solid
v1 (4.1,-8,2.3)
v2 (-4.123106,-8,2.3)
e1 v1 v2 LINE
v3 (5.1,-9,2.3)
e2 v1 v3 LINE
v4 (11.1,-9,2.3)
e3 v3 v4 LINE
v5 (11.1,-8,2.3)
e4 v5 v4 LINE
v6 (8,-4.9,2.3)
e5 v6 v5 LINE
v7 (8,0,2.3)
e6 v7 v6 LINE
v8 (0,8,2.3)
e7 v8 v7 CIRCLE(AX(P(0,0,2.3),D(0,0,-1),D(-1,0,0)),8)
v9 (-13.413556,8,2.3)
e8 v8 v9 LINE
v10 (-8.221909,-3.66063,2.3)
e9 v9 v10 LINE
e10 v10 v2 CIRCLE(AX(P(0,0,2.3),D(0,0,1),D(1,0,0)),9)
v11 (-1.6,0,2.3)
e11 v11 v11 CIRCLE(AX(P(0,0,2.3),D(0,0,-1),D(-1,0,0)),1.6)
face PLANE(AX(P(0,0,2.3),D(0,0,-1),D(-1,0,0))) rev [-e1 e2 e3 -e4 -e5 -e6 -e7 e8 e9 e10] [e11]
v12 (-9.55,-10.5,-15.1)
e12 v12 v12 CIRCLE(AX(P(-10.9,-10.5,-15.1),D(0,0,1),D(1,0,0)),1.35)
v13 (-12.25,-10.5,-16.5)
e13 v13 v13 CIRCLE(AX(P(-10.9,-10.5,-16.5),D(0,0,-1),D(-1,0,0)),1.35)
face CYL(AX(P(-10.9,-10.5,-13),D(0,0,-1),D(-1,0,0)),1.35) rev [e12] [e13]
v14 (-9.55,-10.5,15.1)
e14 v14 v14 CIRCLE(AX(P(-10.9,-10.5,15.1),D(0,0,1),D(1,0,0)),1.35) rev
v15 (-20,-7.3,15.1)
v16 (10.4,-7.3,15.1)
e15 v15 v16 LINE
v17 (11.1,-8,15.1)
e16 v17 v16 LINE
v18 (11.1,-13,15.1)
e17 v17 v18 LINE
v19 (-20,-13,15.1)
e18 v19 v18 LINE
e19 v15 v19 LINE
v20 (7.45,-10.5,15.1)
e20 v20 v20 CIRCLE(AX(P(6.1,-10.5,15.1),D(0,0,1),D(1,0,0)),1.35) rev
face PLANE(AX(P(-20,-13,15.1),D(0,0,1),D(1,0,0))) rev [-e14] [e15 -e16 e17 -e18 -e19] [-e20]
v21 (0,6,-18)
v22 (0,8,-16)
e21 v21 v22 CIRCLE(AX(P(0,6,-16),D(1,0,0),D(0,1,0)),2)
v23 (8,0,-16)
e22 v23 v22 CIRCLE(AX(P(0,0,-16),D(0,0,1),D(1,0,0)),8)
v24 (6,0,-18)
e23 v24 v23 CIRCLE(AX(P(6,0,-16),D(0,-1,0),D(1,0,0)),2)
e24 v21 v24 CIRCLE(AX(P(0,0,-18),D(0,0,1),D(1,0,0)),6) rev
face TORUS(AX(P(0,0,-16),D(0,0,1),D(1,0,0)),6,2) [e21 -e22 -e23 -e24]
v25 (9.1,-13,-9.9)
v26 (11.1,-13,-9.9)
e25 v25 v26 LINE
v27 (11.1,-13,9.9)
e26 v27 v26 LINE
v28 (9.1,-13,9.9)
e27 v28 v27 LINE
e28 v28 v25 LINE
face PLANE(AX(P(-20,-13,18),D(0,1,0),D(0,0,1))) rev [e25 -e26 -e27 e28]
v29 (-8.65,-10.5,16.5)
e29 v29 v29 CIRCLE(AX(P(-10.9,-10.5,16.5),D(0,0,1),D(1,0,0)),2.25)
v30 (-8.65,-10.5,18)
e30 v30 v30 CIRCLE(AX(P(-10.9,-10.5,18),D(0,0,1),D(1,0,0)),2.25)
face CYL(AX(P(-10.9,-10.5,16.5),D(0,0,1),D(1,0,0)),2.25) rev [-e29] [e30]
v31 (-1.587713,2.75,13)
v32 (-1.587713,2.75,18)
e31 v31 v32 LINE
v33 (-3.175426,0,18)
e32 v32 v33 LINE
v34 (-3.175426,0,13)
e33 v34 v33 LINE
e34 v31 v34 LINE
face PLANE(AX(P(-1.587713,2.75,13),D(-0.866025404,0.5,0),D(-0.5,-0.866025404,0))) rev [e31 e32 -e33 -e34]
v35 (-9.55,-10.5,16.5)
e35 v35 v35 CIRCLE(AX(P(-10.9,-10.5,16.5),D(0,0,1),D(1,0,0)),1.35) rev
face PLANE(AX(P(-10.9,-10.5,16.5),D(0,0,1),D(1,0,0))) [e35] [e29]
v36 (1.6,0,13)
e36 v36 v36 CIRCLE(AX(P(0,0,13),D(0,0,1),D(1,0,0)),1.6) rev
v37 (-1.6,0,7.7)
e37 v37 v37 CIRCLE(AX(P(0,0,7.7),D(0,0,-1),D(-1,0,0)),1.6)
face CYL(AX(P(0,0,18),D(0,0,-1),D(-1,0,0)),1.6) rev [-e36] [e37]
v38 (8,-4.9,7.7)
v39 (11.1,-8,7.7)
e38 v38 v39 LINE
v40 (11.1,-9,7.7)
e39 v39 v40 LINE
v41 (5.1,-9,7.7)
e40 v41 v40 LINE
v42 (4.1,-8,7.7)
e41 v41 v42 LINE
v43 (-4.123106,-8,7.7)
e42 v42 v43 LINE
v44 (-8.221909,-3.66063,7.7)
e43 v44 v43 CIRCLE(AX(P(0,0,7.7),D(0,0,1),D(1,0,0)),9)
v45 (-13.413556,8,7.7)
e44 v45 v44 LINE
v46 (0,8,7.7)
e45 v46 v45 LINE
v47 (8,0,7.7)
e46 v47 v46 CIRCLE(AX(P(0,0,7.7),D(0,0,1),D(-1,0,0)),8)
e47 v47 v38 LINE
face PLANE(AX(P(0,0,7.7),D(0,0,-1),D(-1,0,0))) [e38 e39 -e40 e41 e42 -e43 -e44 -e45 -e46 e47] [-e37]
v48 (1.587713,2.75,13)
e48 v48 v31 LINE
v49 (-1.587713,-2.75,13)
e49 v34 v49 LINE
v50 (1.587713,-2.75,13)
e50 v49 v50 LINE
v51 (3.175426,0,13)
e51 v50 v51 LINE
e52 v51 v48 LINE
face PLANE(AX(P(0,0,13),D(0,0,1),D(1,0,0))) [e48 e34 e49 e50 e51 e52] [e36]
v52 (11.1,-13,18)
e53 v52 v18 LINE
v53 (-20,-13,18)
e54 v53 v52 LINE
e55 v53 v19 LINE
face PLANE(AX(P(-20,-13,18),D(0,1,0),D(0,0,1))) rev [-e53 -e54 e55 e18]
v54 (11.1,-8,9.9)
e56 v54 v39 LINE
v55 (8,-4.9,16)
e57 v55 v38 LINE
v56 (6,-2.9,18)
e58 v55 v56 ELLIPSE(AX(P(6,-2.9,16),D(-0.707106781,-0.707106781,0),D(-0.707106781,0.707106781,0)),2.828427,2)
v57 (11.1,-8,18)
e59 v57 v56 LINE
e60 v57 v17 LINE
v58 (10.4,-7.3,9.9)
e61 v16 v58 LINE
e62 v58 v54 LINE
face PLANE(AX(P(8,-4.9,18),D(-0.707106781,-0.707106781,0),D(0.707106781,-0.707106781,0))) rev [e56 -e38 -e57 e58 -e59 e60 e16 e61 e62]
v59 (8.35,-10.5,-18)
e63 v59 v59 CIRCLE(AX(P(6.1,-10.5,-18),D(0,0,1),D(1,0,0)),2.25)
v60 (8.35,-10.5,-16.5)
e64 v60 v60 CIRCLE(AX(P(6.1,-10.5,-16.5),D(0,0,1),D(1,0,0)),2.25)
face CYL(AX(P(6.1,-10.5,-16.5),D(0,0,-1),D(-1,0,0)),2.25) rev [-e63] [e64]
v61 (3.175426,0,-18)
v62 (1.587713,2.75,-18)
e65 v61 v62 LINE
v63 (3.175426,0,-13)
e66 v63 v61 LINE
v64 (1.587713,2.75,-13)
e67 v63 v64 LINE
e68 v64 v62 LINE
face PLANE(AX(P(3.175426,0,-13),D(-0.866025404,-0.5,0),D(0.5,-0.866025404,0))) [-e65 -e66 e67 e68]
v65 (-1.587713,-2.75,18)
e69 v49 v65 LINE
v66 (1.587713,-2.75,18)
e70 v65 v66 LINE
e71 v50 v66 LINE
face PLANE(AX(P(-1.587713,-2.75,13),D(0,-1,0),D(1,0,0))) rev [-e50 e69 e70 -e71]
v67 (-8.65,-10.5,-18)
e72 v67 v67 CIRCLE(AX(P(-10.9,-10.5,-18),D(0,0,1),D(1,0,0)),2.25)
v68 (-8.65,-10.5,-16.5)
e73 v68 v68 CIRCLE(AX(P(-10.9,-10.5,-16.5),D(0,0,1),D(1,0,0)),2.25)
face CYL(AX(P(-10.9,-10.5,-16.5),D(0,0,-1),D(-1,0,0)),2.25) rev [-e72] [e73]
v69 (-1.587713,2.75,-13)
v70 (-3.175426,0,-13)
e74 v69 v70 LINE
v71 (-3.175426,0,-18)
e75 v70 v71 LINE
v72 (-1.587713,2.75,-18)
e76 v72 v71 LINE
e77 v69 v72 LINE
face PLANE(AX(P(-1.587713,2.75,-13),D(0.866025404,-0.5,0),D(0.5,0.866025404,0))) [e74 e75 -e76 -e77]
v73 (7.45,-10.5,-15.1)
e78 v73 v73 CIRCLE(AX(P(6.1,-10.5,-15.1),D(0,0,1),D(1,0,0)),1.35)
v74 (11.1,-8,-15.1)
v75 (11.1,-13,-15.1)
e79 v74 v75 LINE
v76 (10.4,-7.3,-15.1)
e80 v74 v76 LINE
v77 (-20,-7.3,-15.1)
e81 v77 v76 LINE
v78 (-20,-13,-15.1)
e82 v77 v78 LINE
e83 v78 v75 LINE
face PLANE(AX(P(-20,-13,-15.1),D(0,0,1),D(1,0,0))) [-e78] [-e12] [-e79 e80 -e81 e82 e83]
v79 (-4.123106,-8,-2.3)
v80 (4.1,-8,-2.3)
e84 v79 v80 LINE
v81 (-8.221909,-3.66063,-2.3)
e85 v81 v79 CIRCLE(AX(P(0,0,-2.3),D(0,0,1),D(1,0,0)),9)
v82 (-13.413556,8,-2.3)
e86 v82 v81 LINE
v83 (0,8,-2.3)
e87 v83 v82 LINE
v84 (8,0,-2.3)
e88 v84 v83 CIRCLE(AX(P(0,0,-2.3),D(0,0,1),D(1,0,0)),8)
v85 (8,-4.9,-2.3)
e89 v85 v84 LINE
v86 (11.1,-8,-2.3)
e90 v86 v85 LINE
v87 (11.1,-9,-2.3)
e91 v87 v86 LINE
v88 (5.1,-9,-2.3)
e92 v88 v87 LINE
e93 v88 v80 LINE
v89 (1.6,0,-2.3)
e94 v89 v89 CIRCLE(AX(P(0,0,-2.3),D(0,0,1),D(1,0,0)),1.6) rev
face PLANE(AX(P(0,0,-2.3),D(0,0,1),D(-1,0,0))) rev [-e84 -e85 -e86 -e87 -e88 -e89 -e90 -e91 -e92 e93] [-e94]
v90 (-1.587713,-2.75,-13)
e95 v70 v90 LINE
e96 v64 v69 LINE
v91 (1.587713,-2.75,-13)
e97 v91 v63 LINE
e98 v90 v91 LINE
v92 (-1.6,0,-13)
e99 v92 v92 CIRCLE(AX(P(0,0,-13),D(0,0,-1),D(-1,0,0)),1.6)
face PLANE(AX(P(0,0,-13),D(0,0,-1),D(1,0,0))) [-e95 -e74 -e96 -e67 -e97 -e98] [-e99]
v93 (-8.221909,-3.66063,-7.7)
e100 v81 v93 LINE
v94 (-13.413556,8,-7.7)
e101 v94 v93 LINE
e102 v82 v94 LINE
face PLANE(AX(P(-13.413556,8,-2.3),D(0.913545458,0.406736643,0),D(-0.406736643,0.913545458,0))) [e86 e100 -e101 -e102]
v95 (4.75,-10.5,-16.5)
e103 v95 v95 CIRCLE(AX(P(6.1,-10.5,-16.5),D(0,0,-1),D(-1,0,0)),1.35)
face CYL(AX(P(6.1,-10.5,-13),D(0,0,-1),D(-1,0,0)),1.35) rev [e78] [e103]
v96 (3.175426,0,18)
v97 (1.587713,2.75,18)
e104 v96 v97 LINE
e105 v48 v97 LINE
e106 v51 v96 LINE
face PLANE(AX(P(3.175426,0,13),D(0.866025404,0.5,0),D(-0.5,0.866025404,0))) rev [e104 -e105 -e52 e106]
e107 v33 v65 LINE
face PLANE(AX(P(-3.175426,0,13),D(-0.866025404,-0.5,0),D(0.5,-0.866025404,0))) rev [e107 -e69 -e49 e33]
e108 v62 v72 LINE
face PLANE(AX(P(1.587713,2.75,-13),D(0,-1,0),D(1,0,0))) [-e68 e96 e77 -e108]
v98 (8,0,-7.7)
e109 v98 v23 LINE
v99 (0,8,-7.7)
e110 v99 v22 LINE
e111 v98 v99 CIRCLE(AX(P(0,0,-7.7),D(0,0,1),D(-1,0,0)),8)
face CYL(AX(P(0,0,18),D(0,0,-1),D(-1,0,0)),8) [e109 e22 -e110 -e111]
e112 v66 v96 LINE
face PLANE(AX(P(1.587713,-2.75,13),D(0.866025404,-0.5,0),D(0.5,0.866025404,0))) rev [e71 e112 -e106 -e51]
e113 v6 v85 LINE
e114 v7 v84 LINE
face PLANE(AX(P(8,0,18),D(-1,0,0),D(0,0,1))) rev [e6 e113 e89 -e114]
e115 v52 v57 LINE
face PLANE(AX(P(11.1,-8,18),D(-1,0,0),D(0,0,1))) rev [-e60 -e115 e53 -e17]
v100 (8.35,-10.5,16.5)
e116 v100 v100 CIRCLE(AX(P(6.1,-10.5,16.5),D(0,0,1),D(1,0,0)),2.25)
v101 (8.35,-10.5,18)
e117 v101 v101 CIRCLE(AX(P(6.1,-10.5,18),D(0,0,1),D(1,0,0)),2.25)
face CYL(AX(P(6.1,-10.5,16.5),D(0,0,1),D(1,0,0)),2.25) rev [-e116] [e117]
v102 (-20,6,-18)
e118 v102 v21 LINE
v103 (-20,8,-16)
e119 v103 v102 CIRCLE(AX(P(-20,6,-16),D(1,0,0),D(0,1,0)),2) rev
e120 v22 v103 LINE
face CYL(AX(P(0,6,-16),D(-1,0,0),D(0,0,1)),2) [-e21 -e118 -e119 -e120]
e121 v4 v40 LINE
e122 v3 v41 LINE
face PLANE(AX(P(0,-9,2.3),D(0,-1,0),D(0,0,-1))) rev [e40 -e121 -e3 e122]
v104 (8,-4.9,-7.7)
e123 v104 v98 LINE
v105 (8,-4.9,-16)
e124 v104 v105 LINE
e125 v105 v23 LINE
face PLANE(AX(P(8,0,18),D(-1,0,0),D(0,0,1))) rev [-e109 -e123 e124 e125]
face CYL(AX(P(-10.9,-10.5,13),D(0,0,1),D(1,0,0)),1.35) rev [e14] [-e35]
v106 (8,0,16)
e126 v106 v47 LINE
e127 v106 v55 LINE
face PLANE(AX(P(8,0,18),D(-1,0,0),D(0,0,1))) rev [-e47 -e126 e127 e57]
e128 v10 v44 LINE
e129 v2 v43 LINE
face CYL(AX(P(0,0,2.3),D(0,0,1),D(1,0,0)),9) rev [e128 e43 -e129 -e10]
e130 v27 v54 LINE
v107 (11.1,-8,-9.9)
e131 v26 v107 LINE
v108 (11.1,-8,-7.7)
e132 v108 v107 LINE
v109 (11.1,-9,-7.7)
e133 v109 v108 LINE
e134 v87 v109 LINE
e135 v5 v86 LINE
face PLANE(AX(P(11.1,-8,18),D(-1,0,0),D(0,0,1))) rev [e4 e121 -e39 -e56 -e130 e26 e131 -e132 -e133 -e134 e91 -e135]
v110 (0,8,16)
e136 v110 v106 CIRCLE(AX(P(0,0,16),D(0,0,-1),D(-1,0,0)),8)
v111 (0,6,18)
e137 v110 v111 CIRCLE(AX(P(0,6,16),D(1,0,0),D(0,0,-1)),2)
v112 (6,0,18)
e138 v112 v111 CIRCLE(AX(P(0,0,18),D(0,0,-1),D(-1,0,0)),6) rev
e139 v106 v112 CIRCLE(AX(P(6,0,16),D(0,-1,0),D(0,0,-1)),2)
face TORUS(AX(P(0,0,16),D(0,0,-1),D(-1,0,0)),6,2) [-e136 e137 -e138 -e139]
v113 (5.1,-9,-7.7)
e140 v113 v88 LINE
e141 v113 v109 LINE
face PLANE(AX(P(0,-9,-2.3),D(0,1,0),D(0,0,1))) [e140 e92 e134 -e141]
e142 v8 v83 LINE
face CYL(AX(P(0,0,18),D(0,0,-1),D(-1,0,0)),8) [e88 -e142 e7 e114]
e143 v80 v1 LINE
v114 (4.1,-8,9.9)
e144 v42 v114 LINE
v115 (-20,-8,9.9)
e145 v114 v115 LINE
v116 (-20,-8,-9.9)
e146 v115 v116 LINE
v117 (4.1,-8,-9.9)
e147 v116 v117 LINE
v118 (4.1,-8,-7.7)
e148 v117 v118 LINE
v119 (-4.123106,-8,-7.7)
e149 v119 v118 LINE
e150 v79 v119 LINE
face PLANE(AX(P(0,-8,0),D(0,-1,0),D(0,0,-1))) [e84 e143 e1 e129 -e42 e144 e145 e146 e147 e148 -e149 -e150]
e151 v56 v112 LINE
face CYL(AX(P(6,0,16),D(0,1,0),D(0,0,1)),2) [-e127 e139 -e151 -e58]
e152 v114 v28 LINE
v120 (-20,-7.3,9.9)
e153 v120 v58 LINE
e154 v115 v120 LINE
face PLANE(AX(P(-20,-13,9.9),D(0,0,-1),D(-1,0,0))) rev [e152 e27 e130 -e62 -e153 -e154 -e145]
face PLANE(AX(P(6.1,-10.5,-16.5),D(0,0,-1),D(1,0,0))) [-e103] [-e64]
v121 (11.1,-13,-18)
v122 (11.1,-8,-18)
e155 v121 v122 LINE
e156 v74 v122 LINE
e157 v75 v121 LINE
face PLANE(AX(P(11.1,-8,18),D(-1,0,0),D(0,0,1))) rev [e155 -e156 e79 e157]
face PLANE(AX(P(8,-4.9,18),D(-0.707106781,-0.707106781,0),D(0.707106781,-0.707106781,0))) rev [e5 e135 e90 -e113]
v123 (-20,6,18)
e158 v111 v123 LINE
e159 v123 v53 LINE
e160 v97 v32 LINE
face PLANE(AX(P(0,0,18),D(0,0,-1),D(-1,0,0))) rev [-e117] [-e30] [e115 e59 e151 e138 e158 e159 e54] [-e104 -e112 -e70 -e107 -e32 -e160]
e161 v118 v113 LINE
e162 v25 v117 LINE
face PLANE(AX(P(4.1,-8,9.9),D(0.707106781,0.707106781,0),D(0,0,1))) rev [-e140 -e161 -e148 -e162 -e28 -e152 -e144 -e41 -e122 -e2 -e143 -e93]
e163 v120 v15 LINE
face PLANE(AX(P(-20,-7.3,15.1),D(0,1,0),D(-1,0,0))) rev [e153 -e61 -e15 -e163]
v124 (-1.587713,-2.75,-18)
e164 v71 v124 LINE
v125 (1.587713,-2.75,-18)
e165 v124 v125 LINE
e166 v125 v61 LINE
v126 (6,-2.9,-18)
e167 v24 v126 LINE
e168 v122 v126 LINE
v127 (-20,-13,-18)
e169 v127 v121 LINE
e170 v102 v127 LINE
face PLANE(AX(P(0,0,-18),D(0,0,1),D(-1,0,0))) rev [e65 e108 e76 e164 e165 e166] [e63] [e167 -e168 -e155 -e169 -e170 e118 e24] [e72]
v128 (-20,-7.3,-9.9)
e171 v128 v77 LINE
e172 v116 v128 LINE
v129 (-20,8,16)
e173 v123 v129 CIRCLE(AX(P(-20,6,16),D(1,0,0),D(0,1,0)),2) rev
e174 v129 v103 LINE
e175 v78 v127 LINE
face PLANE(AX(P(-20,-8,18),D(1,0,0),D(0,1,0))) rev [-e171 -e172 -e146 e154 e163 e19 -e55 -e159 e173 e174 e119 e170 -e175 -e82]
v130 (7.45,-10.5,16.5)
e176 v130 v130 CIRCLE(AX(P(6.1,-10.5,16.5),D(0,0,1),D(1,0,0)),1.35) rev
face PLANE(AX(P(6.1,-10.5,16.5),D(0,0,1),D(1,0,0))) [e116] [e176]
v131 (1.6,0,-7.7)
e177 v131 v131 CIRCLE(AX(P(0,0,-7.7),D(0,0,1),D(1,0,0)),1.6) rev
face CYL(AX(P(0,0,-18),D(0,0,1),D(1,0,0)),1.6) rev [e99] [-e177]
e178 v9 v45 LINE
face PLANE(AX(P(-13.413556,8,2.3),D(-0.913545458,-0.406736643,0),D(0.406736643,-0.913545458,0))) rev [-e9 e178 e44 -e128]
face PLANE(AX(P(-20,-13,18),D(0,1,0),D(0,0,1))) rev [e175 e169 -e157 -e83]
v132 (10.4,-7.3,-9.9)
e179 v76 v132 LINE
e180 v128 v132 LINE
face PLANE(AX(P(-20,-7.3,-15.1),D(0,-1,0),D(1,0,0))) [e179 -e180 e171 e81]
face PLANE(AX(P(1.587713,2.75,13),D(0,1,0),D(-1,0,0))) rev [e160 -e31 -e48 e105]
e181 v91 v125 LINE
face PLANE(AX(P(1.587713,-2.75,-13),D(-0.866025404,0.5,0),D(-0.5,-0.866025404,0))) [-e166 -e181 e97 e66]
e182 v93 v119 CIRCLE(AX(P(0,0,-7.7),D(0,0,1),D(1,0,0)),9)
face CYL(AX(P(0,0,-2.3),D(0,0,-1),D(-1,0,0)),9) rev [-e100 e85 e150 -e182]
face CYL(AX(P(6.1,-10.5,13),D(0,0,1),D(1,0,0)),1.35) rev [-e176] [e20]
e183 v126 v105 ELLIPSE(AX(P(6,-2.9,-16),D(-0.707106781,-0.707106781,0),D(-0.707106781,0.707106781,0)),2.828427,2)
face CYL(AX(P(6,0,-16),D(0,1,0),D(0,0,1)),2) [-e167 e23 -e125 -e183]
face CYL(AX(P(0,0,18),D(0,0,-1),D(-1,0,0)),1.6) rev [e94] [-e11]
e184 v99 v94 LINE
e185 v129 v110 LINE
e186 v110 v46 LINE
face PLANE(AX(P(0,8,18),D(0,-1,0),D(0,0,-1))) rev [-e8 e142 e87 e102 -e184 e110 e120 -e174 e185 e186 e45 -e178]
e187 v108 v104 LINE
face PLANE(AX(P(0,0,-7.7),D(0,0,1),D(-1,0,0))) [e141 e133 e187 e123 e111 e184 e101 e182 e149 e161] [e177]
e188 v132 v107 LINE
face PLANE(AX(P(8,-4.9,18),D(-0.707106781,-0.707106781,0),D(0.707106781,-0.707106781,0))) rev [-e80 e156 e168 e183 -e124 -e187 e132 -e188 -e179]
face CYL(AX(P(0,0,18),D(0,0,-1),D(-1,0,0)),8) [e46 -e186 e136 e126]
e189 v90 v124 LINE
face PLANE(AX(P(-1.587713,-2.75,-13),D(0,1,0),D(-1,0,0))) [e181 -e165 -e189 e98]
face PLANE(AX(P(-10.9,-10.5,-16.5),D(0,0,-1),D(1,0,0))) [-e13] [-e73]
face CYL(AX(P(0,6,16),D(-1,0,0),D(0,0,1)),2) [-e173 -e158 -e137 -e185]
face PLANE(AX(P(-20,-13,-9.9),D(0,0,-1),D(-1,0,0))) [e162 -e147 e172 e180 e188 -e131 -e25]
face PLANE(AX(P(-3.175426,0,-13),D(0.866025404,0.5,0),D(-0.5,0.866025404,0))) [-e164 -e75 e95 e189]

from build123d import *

# Parameters (mm, degrees)
BOSS_EXTRUDE1_DEPTH   = 18
CROQUIS2_R            = 1.35
CORTAR_EXTRUIR2_DEPTH = 5
SKETCH3_R             = 2.25
CUT_EXTRUDE1_DEPTH    = 1.5
SKETCH5_W             = 5.2
SKETCH5_H             = 5.7
CUT_EXTRUDE2_DEPTH    = 39.212694226
CUT_EXTRUDE3_START    = -15.7
CUT_EXTRUDE3_DEPTH    = 5.4
CROQUIS1_R            = 1.6
CORTAR_EXTRUIR1_DEPTH = 30.883105595
CUT_EXTRUDE7_DEPTH    = 5
SKETCH7_W             = 24.1
SKETCH7_H             = 19.8
CUT_EXTRUDE4_DEPTH    = 5
FILLET5_R             = 2
CHAFL_N1_SIZE         = 5


with BuildPart() as part:
    # Sketch1 → Boss-Extrude1 (new body)
    with BuildSketch(Plane.XY):
        with BuildLine():
            Line((-20, 5.553828843), (-20, -8))
            Line((-20, -8), (-20, -13))
            Line((-20, -13), (11.1, -13))
            Line((11.1, -13), (11.1, -8))
            Line((11.1, -8), (8, -4.9))
            Line((8, -4.9), (8, 0))
            ThreePointArc((8, 0), (5.656854249, 5.656854249), (0, 8))
            Line((0, 8), (-20, 8))
            Line((-20, 8), (-20, 5.553828843))
        make_face()
    boss_extrude1 = extrude(amount=BOSS_EXTRUDE1_DEPTH)

    # Croquis2 → Cortar-Extruir2 (cut)
    with BuildSketch(Plane.XY.offset(18)):
        with Locations((-10.9, -10.5)):
            Circle(CROQUIS2_R)
        with Locations((6.1, -10.5)):
            Circle(CROQUIS2_R)
    cortar_extruir2 = extrude(amount=-CORTAR_EXTRUIR2_DEPTH, mode=Mode.SUBTRACT)

    # Sketch3 → Cut-Extrude1 (cut)
    with BuildSketch(Plane.XY.offset(18)):
        with Locations((-10.9, -10.5)):
            Circle(SKETCH3_R)
        with Locations((6.1, -10.5)):
            Circle(SKETCH3_R)
    cut_extrude1 = extrude(amount=-CUT_EXTRUDE1_DEPTH, mode=Mode.SUBTRACT)

    # Sketch5 → Cut-Extrude2 (cut, through all)
    with BuildSketch(Plane(origin=(11.1, 0, 0), x_dir=(0, 0, -1), z_dir=(1, 0, 0))):
        with Locations((-12.5, -10.15)):
            Rectangle(SKETCH5_W, SKETCH5_H)
    cut_extrude2 = extrude(amount=-CUT_EXTRUDE2_DEPTH, mode=Mode.SUBTRACT)

    # Sketch6 → Cut-Extrude3 (cut)
    with BuildSketch(Plane.XY.offset(18).offset(CUT_EXTRUDE3_START)):
        with BuildLine():
            Line((-13.413555989, 8), (-8.221909119, -3.660629788))
            ThreePointArc((-8.221909119, -3.660629788), (-4.901751315, -7.548035112), (0, -9))
            Line((0, -9), (14.43375673, -9))
            Line((14.43375673, -9), (6.92820323, 4))
            ThreePointArc((6.92820323, 4), (4, 6.92820323), (0, 8))
            Line((0, 8), (-13.413555989, 8))
        make_face()
    cut_extrude3 = extrude(amount=CUT_EXTRUDE3_DEPTH, mode=Mode.SUBTRACT)

    # Croquis1 → Cortar-Extruir1 (cut, through all)
    with BuildSketch(Plane(origin=(0, 0, 0), x_dir=(-1, 0, 0), z_dir=(0, 0, -1))):
        Circle(CROQUIS1_R)
    cortar_extruir1 = extrude(amount=-CORTAR_EXTRUIR1_DEPTH, mode=Mode.SUBTRACT)

    # Sketch10 → Cut-Extrude7 (cut)
    with BuildSketch(Plane.XY.offset(18)):
        Polygon((3.175426481, 0), (1.58771324, 2.75), (-1.58771324, 2.75), (-3.175426481, 0), (-1.58771324, -2.75), (1.58771324, -2.75), align=None)
    cut_extrude7 = extrude(amount=-CUT_EXTRUDE7_DEPTH, mode=Mode.SUBTRACT)

    # Mirror1: Boss-Extrude1, Cortar-Extruir2, Cut-Extrude1, Cut-Extrude2, Cut-Extrude3, Cortar-Extruir1, Cut-Extrude7 across plane
    add(boss_extrude1.mirror(Plane(origin=(0, 0, 0), x_dir=(1, 0, 0), z_dir=(0, 0, -1))))
    add(cortar_extruir2.mirror(Plane(origin=(0, 0, 0), x_dir=(1, 0, 0), z_dir=(0, 0, -1))), mode=Mode.SUBTRACT)
    add(cut_extrude1.mirror(Plane(origin=(0, 0, 0), x_dir=(1, 0, 0), z_dir=(0, 0, -1))), mode=Mode.SUBTRACT)
    add(cut_extrude2.mirror(Plane(origin=(0, 0, 0), x_dir=(1, 0, 0), z_dir=(0, 0, -1))), mode=Mode.SUBTRACT)
    add(cut_extrude3.mirror(Plane(origin=(0, 0, 0), x_dir=(1, 0, 0), z_dir=(0, 0, -1))), mode=Mode.SUBTRACT)
    add(cortar_extruir1.mirror(Plane(origin=(0, 0, 0), x_dir=(1, 0, 0), z_dir=(0, 0, -1))), mode=Mode.SUBTRACT)
    add(cut_extrude7.mirror(Plane(origin=(0, 0, 0), x_dir=(1, 0, 0), z_dir=(0, 0, -1))), mode=Mode.SUBTRACT)

    # Sketch7 → Cut-Extrude4 (cut)
    with BuildSketch(Plane.XZ.offset(13)):
        with Locations((-7.95, 0)):
            Rectangle(SKETCH7_W, SKETCH7_H)
    extrude(amount=-CUT_EXTRUDE4_DEPTH, mode=Mode.SUBTRACT)

    # Fillet5
    fillet5_edges = [part.edges().sort_by_distance(p)[0] for p in [
        (5.656854249, 5.656854249, 18),
        (-10, 8, 18),
        (-10, 8, -18),
        (5.656854249, 5.656854249, -18),
        (8, -2.45, -18),
        (8, -2.45, 18),
    ]]
    fillet(fillet5_edges, radius=FILLET5_R)

    # Chaflán1
    # the kernel refuses this chamfer: 5 mm, written as the material it takes off along each edge
    with BuildSketch(Plane(origin=(4.1, -13, 22.75841494), x_dir=(0.9996219169112968, -0.027495876610586317, 0), z_dir=(0, 0, -1))) as chafl_n1_piece_1_section:
        Polygon((CHAFL_N1_SIZE * 0.999621916911, -CHAFL_N1_SIZE * 0.0274958766106), (-CHAFL_N1_SIZE * 0.0274958766106, -CHAFL_N1_SIZE * 0.999621916911), (0, 0), align=None)
    chafl_n1_piece_1 = extrude(amount=45.51682988, mode=Mode.PRIVATE)
    chafl_n1_piece_1 = split(chafl_n1_piece_1, bisect_by=Plane(origin=(8.49756634, -12.423659296, -15.1), z_dir=(0, 0, 1)), keep=Keep.TOP, mode=Mode.PRIVATE)
    chafl_n1_piece_1 = split(chafl_n1_piece_1, bisect_by=Plane(origin=(8.49756634, -12.423659296, 15.1), z_dir=(0, 0, -1)), keep=Keep.TOP, mode=Mode.PRIVATE)
    add(chafl_n1_piece_1, mode=Mode.SUBTRACT)


solid = part.part
